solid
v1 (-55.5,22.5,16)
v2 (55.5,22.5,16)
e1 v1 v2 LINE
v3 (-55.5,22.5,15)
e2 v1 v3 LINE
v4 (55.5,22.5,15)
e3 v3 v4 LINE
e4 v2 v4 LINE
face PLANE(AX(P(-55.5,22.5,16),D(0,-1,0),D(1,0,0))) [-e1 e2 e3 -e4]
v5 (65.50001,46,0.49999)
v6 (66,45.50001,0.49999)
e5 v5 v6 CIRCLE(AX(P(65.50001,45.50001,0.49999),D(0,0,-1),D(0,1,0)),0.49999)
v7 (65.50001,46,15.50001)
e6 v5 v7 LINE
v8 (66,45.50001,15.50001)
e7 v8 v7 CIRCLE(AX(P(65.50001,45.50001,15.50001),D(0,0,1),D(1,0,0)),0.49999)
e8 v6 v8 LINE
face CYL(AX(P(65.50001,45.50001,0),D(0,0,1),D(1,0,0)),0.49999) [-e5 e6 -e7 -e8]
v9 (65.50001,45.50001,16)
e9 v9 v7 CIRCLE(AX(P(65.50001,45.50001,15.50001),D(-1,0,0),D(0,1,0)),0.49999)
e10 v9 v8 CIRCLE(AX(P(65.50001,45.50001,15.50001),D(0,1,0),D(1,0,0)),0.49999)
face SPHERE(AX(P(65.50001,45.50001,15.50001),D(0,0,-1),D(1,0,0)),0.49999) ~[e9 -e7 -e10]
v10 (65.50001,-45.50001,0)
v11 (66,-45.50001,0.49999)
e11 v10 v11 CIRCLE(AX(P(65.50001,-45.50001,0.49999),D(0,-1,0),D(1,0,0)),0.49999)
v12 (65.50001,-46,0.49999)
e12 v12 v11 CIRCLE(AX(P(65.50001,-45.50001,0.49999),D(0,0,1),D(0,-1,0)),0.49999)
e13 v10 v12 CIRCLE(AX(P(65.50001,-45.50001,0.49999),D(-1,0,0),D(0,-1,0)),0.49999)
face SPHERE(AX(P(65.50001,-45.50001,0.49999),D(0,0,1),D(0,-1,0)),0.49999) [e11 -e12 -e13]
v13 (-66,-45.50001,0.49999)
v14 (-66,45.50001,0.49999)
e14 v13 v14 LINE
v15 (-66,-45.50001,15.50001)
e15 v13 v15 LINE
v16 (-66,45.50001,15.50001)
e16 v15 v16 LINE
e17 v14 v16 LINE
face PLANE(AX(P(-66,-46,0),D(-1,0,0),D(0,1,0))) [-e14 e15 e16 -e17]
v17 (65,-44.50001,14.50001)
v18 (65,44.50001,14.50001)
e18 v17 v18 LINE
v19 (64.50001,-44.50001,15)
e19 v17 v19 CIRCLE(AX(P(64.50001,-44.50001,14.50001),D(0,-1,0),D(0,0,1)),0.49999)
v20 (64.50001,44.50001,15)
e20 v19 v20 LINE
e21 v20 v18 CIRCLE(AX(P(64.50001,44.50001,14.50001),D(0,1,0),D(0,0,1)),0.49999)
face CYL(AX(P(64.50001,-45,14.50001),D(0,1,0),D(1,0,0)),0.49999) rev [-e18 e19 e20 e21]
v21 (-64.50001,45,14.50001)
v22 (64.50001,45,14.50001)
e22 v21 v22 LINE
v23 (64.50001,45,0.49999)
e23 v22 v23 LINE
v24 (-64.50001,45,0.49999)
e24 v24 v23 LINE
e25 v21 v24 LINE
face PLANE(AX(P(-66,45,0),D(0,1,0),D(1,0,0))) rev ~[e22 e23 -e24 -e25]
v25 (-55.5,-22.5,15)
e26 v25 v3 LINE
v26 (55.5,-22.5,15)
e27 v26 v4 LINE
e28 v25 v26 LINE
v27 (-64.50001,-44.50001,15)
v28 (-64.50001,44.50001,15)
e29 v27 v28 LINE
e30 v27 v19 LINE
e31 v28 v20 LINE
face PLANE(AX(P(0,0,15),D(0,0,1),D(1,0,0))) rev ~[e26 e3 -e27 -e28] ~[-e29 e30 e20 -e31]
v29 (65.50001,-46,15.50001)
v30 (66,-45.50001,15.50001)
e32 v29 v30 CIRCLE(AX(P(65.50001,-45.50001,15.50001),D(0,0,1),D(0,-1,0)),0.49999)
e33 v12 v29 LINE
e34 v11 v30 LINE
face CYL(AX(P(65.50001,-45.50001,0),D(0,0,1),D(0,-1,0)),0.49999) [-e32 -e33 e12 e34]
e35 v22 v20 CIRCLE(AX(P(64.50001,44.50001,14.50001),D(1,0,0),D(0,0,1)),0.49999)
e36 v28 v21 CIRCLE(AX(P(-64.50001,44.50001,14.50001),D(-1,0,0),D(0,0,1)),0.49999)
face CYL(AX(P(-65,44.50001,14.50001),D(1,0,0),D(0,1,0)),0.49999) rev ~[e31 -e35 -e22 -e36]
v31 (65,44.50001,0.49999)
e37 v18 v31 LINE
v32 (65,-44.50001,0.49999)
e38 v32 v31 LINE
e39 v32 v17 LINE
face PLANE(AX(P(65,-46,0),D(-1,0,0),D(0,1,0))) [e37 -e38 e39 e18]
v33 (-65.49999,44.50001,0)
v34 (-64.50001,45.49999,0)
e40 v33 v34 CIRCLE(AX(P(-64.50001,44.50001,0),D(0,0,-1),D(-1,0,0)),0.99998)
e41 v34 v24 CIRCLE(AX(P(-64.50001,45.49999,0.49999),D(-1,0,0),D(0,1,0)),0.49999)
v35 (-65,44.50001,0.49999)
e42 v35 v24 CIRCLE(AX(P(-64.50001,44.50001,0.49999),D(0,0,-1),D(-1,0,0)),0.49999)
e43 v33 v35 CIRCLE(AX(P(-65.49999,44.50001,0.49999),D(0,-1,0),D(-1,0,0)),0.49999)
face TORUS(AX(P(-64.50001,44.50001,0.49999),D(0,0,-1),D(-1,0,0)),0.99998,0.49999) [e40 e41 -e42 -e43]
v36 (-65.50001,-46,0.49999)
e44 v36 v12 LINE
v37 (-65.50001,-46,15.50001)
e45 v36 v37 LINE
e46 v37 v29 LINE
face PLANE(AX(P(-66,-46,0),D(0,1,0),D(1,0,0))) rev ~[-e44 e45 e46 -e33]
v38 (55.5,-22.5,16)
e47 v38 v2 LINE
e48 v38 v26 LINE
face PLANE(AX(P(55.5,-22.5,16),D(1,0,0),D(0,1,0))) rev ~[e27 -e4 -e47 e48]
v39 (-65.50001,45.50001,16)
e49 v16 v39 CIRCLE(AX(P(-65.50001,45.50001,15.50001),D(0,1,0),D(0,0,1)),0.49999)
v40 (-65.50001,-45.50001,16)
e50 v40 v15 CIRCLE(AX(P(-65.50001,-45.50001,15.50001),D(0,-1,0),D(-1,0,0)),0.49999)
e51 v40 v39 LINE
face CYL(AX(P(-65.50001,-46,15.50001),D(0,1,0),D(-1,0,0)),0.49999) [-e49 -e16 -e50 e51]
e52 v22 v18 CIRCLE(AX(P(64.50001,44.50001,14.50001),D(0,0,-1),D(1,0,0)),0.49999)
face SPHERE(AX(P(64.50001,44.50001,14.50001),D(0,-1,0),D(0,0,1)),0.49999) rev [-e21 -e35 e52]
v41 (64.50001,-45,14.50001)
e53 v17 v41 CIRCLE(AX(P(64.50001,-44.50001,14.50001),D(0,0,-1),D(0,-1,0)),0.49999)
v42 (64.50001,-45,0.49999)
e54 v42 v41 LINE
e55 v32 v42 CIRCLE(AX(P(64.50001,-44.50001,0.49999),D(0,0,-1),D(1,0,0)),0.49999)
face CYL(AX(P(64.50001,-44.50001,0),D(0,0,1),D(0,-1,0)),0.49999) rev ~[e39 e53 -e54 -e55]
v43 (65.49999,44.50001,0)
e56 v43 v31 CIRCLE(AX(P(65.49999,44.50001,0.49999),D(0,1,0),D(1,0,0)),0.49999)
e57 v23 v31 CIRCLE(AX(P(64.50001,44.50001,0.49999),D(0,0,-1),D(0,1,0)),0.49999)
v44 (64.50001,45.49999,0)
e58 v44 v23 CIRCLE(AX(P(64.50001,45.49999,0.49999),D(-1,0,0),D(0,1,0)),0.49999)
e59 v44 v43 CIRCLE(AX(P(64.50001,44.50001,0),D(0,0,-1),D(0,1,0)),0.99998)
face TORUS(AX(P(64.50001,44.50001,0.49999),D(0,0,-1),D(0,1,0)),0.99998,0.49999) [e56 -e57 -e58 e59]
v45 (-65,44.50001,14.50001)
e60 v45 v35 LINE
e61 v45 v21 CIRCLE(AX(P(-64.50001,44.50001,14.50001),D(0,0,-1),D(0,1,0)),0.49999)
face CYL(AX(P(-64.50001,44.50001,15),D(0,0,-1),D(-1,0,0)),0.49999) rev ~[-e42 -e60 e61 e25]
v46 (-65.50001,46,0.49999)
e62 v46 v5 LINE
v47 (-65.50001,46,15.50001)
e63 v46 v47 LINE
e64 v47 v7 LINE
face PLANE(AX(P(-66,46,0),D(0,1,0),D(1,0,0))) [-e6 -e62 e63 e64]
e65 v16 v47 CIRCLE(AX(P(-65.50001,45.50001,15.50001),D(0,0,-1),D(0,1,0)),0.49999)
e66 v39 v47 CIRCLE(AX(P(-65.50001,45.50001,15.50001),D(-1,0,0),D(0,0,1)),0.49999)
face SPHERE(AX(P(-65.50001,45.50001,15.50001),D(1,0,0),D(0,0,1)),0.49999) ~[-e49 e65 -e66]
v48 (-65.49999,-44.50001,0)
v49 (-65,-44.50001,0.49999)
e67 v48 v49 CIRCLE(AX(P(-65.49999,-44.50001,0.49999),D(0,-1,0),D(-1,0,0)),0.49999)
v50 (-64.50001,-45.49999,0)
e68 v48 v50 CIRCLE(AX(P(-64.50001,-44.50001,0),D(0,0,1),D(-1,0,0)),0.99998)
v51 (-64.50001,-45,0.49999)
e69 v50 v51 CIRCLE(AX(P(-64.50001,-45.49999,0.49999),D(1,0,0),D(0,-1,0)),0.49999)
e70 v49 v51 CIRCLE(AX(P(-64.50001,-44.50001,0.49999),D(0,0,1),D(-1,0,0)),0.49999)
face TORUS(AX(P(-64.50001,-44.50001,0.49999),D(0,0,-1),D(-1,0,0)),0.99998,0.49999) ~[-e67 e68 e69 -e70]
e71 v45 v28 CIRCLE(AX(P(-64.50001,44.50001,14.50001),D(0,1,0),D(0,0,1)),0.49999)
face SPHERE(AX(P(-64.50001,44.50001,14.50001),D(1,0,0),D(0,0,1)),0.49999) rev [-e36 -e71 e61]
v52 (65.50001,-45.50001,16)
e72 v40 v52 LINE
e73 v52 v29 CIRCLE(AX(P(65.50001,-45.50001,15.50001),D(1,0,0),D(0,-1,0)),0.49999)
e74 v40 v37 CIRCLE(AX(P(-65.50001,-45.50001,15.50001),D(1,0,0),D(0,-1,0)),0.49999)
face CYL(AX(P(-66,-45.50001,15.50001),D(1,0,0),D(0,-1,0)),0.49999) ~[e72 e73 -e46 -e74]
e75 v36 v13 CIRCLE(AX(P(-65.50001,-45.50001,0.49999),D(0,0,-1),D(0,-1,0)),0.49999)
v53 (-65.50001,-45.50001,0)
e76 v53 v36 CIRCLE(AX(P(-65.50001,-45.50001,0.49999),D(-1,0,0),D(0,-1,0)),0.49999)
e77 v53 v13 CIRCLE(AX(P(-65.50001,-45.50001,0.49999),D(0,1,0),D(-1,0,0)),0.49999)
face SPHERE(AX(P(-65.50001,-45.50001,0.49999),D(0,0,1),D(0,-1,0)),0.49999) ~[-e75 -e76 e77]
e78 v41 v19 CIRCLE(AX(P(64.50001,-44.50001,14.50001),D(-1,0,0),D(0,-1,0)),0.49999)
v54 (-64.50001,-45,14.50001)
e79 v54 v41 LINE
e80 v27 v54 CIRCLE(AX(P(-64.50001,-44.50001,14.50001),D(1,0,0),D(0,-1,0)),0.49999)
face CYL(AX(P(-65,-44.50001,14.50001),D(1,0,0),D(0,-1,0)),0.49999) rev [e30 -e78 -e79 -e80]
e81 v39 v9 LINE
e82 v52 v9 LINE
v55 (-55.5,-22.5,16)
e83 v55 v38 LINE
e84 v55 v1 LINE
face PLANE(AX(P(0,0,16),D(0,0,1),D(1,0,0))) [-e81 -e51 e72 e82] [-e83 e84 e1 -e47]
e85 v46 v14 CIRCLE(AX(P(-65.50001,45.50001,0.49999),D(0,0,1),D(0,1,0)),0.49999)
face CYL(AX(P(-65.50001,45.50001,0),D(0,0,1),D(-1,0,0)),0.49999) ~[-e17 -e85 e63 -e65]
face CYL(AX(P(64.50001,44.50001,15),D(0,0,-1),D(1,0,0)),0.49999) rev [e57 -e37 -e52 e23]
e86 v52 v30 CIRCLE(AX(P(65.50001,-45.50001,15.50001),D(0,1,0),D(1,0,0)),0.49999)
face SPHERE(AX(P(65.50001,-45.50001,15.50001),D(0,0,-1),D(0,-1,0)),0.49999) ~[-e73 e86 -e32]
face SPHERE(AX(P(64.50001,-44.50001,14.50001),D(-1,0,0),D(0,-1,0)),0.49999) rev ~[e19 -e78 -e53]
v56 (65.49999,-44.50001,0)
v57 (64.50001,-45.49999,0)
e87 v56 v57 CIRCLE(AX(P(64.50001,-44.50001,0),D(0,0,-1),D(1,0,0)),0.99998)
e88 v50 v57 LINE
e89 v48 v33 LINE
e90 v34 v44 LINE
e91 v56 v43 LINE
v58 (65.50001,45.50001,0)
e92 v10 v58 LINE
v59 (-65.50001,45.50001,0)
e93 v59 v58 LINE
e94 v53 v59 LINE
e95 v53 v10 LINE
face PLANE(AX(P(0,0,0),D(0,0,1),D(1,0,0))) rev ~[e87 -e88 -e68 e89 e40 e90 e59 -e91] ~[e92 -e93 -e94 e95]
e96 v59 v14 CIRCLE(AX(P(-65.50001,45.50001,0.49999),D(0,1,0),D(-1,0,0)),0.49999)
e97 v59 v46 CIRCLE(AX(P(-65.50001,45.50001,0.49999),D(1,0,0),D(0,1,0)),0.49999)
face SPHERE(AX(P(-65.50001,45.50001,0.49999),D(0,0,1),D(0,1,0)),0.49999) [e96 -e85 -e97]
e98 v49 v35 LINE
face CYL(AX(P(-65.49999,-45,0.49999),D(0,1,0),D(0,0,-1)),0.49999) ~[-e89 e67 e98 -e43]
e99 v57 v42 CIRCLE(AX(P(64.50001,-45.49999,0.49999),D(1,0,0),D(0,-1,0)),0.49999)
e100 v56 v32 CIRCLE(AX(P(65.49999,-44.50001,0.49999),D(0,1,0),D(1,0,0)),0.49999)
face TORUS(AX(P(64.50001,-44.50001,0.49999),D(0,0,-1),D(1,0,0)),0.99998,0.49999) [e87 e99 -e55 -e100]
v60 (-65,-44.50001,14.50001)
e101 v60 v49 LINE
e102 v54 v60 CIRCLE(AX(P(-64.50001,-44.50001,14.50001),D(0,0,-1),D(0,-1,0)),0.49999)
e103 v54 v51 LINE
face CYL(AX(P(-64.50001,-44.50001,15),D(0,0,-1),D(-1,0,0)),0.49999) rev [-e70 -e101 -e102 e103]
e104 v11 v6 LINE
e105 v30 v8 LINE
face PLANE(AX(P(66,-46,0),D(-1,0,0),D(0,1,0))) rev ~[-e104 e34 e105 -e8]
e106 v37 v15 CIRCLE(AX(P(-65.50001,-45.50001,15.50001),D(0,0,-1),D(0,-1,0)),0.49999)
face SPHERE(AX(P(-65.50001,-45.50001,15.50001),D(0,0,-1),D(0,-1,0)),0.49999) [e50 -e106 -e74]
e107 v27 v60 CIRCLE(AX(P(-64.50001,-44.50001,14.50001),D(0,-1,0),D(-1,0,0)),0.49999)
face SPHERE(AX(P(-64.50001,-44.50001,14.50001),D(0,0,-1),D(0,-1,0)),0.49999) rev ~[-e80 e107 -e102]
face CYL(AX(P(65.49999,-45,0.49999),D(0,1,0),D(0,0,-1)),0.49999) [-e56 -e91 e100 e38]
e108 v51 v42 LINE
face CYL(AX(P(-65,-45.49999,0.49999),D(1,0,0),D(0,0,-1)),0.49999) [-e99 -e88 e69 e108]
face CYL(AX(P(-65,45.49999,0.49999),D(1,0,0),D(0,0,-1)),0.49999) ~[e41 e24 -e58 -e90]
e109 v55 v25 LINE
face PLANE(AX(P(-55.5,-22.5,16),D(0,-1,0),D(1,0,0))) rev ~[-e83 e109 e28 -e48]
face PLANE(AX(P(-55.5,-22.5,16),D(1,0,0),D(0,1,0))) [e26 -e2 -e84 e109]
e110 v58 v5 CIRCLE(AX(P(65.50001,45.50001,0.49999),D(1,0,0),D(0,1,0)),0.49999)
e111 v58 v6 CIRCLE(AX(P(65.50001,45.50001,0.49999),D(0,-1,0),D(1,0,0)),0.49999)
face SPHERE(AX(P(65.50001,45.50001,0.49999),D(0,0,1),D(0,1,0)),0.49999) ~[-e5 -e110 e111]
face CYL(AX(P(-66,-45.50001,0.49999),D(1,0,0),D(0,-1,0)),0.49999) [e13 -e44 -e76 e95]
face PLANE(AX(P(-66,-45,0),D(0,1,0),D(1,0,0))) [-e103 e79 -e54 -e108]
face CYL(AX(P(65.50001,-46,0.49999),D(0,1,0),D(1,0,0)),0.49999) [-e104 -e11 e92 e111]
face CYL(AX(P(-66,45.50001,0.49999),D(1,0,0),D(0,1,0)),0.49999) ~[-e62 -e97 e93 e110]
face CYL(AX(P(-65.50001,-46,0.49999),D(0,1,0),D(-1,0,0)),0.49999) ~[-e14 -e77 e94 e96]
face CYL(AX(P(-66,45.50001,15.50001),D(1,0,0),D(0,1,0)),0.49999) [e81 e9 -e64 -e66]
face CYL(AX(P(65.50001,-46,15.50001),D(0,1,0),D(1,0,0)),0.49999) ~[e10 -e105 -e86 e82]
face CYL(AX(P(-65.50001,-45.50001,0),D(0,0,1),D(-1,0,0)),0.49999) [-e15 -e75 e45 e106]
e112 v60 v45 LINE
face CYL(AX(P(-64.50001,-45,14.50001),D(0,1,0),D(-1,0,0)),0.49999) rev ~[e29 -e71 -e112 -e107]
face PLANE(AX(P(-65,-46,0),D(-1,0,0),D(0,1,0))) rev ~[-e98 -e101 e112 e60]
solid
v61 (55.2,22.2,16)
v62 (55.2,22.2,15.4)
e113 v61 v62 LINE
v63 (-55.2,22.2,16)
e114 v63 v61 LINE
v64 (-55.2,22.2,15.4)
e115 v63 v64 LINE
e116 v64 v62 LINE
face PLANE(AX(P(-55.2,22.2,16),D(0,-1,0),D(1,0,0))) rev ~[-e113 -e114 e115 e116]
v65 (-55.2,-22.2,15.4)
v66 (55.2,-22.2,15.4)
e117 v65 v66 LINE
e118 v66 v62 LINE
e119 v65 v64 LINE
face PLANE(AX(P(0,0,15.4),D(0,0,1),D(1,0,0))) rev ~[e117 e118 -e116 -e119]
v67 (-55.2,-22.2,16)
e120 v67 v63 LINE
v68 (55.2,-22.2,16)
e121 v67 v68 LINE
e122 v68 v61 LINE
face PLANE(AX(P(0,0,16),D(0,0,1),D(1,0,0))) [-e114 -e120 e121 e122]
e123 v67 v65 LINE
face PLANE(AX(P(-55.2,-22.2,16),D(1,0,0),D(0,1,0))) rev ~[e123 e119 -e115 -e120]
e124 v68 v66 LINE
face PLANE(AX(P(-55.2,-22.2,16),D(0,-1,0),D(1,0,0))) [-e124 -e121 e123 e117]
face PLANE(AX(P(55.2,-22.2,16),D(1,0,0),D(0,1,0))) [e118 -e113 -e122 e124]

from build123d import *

# Parameters (mm, degrees)
F0_W     = 132
F0_H     = 92
F1_DEPTH = 16
F2_T     = -1
F3_R     = 0.49999
F4_W     = 111
F4_H     = 45
F5_DEPTH = 2
F6_W     = 110.3999990821
F6_H     = 44.3999990821
F7_DEPTH = 0.6


# Not quite as in the source:
# - a fillet or chamfer is up to 0.001 mm smaller than in the source, because OpenCascade refuses the exact size


with BuildPart() as f1:
    # F0 (on Top) → F1 (new body)
    with BuildSketch(Plane.XY):
        Rectangle(F0_W, F0_H)
    extrude(amount=F1_DEPTH)

    # F2
    f2_openings = [f1.faces().sort_by_distance(p)[0] for p in [
        (0, 0, 0),
    ]]
    offset(amount=F2_T, openings=f2_openings)

    # F3 (radius 0.5 in the source; OpenCascade refuses exactly that, so slightly less here)
    f3_edges = [f1.edges().sort_by_distance(p)[0] for p in [
        (66, -46, 8),
        (-66, -46, 8),
        (0, -46, 0),
        (0, -46, 16),
        (66, 46, 8),
        (66, 0, 16),
        (0, 46, 16),
        (-66, 0, 16),
        (-66, 46, 8),
        (0, 46, 0),
        (66, 0, 0),
        (-66, 0, 0),
        (0, -45, 0),
        (-65, -45, 7.5),
        (0, -45, 15),
        (65, -45, 7.5),
        (65, 0, 15),
        (0, 45, 15),
        (-65, 0, 15),
        (65, 45, 7.5),
        (0, 45, 0),
        (-65, 45, 7.5),
        (65, 0, 0),
        (-65, 0, 0),
    ]]
    fillet(f3_edges, radius=F3_R)

    # F4 (on face) → F5 (cut)
    with BuildSketch(Plane.XY.offset(16)):
        Rectangle(F4_W, F4_H)
    extrude(amount=-F5_DEPTH, mode=Mode.SUBTRACT)


with BuildPart() as f7:
    # F6 (on face) → F7 (new body)
    with BuildSketch(Plane.XY.offset(16)):
        Rectangle(F6_W, F6_H)
    extrude(amount=-F7_DEPTH)


solid = Compound([f1.part, f7.part])
